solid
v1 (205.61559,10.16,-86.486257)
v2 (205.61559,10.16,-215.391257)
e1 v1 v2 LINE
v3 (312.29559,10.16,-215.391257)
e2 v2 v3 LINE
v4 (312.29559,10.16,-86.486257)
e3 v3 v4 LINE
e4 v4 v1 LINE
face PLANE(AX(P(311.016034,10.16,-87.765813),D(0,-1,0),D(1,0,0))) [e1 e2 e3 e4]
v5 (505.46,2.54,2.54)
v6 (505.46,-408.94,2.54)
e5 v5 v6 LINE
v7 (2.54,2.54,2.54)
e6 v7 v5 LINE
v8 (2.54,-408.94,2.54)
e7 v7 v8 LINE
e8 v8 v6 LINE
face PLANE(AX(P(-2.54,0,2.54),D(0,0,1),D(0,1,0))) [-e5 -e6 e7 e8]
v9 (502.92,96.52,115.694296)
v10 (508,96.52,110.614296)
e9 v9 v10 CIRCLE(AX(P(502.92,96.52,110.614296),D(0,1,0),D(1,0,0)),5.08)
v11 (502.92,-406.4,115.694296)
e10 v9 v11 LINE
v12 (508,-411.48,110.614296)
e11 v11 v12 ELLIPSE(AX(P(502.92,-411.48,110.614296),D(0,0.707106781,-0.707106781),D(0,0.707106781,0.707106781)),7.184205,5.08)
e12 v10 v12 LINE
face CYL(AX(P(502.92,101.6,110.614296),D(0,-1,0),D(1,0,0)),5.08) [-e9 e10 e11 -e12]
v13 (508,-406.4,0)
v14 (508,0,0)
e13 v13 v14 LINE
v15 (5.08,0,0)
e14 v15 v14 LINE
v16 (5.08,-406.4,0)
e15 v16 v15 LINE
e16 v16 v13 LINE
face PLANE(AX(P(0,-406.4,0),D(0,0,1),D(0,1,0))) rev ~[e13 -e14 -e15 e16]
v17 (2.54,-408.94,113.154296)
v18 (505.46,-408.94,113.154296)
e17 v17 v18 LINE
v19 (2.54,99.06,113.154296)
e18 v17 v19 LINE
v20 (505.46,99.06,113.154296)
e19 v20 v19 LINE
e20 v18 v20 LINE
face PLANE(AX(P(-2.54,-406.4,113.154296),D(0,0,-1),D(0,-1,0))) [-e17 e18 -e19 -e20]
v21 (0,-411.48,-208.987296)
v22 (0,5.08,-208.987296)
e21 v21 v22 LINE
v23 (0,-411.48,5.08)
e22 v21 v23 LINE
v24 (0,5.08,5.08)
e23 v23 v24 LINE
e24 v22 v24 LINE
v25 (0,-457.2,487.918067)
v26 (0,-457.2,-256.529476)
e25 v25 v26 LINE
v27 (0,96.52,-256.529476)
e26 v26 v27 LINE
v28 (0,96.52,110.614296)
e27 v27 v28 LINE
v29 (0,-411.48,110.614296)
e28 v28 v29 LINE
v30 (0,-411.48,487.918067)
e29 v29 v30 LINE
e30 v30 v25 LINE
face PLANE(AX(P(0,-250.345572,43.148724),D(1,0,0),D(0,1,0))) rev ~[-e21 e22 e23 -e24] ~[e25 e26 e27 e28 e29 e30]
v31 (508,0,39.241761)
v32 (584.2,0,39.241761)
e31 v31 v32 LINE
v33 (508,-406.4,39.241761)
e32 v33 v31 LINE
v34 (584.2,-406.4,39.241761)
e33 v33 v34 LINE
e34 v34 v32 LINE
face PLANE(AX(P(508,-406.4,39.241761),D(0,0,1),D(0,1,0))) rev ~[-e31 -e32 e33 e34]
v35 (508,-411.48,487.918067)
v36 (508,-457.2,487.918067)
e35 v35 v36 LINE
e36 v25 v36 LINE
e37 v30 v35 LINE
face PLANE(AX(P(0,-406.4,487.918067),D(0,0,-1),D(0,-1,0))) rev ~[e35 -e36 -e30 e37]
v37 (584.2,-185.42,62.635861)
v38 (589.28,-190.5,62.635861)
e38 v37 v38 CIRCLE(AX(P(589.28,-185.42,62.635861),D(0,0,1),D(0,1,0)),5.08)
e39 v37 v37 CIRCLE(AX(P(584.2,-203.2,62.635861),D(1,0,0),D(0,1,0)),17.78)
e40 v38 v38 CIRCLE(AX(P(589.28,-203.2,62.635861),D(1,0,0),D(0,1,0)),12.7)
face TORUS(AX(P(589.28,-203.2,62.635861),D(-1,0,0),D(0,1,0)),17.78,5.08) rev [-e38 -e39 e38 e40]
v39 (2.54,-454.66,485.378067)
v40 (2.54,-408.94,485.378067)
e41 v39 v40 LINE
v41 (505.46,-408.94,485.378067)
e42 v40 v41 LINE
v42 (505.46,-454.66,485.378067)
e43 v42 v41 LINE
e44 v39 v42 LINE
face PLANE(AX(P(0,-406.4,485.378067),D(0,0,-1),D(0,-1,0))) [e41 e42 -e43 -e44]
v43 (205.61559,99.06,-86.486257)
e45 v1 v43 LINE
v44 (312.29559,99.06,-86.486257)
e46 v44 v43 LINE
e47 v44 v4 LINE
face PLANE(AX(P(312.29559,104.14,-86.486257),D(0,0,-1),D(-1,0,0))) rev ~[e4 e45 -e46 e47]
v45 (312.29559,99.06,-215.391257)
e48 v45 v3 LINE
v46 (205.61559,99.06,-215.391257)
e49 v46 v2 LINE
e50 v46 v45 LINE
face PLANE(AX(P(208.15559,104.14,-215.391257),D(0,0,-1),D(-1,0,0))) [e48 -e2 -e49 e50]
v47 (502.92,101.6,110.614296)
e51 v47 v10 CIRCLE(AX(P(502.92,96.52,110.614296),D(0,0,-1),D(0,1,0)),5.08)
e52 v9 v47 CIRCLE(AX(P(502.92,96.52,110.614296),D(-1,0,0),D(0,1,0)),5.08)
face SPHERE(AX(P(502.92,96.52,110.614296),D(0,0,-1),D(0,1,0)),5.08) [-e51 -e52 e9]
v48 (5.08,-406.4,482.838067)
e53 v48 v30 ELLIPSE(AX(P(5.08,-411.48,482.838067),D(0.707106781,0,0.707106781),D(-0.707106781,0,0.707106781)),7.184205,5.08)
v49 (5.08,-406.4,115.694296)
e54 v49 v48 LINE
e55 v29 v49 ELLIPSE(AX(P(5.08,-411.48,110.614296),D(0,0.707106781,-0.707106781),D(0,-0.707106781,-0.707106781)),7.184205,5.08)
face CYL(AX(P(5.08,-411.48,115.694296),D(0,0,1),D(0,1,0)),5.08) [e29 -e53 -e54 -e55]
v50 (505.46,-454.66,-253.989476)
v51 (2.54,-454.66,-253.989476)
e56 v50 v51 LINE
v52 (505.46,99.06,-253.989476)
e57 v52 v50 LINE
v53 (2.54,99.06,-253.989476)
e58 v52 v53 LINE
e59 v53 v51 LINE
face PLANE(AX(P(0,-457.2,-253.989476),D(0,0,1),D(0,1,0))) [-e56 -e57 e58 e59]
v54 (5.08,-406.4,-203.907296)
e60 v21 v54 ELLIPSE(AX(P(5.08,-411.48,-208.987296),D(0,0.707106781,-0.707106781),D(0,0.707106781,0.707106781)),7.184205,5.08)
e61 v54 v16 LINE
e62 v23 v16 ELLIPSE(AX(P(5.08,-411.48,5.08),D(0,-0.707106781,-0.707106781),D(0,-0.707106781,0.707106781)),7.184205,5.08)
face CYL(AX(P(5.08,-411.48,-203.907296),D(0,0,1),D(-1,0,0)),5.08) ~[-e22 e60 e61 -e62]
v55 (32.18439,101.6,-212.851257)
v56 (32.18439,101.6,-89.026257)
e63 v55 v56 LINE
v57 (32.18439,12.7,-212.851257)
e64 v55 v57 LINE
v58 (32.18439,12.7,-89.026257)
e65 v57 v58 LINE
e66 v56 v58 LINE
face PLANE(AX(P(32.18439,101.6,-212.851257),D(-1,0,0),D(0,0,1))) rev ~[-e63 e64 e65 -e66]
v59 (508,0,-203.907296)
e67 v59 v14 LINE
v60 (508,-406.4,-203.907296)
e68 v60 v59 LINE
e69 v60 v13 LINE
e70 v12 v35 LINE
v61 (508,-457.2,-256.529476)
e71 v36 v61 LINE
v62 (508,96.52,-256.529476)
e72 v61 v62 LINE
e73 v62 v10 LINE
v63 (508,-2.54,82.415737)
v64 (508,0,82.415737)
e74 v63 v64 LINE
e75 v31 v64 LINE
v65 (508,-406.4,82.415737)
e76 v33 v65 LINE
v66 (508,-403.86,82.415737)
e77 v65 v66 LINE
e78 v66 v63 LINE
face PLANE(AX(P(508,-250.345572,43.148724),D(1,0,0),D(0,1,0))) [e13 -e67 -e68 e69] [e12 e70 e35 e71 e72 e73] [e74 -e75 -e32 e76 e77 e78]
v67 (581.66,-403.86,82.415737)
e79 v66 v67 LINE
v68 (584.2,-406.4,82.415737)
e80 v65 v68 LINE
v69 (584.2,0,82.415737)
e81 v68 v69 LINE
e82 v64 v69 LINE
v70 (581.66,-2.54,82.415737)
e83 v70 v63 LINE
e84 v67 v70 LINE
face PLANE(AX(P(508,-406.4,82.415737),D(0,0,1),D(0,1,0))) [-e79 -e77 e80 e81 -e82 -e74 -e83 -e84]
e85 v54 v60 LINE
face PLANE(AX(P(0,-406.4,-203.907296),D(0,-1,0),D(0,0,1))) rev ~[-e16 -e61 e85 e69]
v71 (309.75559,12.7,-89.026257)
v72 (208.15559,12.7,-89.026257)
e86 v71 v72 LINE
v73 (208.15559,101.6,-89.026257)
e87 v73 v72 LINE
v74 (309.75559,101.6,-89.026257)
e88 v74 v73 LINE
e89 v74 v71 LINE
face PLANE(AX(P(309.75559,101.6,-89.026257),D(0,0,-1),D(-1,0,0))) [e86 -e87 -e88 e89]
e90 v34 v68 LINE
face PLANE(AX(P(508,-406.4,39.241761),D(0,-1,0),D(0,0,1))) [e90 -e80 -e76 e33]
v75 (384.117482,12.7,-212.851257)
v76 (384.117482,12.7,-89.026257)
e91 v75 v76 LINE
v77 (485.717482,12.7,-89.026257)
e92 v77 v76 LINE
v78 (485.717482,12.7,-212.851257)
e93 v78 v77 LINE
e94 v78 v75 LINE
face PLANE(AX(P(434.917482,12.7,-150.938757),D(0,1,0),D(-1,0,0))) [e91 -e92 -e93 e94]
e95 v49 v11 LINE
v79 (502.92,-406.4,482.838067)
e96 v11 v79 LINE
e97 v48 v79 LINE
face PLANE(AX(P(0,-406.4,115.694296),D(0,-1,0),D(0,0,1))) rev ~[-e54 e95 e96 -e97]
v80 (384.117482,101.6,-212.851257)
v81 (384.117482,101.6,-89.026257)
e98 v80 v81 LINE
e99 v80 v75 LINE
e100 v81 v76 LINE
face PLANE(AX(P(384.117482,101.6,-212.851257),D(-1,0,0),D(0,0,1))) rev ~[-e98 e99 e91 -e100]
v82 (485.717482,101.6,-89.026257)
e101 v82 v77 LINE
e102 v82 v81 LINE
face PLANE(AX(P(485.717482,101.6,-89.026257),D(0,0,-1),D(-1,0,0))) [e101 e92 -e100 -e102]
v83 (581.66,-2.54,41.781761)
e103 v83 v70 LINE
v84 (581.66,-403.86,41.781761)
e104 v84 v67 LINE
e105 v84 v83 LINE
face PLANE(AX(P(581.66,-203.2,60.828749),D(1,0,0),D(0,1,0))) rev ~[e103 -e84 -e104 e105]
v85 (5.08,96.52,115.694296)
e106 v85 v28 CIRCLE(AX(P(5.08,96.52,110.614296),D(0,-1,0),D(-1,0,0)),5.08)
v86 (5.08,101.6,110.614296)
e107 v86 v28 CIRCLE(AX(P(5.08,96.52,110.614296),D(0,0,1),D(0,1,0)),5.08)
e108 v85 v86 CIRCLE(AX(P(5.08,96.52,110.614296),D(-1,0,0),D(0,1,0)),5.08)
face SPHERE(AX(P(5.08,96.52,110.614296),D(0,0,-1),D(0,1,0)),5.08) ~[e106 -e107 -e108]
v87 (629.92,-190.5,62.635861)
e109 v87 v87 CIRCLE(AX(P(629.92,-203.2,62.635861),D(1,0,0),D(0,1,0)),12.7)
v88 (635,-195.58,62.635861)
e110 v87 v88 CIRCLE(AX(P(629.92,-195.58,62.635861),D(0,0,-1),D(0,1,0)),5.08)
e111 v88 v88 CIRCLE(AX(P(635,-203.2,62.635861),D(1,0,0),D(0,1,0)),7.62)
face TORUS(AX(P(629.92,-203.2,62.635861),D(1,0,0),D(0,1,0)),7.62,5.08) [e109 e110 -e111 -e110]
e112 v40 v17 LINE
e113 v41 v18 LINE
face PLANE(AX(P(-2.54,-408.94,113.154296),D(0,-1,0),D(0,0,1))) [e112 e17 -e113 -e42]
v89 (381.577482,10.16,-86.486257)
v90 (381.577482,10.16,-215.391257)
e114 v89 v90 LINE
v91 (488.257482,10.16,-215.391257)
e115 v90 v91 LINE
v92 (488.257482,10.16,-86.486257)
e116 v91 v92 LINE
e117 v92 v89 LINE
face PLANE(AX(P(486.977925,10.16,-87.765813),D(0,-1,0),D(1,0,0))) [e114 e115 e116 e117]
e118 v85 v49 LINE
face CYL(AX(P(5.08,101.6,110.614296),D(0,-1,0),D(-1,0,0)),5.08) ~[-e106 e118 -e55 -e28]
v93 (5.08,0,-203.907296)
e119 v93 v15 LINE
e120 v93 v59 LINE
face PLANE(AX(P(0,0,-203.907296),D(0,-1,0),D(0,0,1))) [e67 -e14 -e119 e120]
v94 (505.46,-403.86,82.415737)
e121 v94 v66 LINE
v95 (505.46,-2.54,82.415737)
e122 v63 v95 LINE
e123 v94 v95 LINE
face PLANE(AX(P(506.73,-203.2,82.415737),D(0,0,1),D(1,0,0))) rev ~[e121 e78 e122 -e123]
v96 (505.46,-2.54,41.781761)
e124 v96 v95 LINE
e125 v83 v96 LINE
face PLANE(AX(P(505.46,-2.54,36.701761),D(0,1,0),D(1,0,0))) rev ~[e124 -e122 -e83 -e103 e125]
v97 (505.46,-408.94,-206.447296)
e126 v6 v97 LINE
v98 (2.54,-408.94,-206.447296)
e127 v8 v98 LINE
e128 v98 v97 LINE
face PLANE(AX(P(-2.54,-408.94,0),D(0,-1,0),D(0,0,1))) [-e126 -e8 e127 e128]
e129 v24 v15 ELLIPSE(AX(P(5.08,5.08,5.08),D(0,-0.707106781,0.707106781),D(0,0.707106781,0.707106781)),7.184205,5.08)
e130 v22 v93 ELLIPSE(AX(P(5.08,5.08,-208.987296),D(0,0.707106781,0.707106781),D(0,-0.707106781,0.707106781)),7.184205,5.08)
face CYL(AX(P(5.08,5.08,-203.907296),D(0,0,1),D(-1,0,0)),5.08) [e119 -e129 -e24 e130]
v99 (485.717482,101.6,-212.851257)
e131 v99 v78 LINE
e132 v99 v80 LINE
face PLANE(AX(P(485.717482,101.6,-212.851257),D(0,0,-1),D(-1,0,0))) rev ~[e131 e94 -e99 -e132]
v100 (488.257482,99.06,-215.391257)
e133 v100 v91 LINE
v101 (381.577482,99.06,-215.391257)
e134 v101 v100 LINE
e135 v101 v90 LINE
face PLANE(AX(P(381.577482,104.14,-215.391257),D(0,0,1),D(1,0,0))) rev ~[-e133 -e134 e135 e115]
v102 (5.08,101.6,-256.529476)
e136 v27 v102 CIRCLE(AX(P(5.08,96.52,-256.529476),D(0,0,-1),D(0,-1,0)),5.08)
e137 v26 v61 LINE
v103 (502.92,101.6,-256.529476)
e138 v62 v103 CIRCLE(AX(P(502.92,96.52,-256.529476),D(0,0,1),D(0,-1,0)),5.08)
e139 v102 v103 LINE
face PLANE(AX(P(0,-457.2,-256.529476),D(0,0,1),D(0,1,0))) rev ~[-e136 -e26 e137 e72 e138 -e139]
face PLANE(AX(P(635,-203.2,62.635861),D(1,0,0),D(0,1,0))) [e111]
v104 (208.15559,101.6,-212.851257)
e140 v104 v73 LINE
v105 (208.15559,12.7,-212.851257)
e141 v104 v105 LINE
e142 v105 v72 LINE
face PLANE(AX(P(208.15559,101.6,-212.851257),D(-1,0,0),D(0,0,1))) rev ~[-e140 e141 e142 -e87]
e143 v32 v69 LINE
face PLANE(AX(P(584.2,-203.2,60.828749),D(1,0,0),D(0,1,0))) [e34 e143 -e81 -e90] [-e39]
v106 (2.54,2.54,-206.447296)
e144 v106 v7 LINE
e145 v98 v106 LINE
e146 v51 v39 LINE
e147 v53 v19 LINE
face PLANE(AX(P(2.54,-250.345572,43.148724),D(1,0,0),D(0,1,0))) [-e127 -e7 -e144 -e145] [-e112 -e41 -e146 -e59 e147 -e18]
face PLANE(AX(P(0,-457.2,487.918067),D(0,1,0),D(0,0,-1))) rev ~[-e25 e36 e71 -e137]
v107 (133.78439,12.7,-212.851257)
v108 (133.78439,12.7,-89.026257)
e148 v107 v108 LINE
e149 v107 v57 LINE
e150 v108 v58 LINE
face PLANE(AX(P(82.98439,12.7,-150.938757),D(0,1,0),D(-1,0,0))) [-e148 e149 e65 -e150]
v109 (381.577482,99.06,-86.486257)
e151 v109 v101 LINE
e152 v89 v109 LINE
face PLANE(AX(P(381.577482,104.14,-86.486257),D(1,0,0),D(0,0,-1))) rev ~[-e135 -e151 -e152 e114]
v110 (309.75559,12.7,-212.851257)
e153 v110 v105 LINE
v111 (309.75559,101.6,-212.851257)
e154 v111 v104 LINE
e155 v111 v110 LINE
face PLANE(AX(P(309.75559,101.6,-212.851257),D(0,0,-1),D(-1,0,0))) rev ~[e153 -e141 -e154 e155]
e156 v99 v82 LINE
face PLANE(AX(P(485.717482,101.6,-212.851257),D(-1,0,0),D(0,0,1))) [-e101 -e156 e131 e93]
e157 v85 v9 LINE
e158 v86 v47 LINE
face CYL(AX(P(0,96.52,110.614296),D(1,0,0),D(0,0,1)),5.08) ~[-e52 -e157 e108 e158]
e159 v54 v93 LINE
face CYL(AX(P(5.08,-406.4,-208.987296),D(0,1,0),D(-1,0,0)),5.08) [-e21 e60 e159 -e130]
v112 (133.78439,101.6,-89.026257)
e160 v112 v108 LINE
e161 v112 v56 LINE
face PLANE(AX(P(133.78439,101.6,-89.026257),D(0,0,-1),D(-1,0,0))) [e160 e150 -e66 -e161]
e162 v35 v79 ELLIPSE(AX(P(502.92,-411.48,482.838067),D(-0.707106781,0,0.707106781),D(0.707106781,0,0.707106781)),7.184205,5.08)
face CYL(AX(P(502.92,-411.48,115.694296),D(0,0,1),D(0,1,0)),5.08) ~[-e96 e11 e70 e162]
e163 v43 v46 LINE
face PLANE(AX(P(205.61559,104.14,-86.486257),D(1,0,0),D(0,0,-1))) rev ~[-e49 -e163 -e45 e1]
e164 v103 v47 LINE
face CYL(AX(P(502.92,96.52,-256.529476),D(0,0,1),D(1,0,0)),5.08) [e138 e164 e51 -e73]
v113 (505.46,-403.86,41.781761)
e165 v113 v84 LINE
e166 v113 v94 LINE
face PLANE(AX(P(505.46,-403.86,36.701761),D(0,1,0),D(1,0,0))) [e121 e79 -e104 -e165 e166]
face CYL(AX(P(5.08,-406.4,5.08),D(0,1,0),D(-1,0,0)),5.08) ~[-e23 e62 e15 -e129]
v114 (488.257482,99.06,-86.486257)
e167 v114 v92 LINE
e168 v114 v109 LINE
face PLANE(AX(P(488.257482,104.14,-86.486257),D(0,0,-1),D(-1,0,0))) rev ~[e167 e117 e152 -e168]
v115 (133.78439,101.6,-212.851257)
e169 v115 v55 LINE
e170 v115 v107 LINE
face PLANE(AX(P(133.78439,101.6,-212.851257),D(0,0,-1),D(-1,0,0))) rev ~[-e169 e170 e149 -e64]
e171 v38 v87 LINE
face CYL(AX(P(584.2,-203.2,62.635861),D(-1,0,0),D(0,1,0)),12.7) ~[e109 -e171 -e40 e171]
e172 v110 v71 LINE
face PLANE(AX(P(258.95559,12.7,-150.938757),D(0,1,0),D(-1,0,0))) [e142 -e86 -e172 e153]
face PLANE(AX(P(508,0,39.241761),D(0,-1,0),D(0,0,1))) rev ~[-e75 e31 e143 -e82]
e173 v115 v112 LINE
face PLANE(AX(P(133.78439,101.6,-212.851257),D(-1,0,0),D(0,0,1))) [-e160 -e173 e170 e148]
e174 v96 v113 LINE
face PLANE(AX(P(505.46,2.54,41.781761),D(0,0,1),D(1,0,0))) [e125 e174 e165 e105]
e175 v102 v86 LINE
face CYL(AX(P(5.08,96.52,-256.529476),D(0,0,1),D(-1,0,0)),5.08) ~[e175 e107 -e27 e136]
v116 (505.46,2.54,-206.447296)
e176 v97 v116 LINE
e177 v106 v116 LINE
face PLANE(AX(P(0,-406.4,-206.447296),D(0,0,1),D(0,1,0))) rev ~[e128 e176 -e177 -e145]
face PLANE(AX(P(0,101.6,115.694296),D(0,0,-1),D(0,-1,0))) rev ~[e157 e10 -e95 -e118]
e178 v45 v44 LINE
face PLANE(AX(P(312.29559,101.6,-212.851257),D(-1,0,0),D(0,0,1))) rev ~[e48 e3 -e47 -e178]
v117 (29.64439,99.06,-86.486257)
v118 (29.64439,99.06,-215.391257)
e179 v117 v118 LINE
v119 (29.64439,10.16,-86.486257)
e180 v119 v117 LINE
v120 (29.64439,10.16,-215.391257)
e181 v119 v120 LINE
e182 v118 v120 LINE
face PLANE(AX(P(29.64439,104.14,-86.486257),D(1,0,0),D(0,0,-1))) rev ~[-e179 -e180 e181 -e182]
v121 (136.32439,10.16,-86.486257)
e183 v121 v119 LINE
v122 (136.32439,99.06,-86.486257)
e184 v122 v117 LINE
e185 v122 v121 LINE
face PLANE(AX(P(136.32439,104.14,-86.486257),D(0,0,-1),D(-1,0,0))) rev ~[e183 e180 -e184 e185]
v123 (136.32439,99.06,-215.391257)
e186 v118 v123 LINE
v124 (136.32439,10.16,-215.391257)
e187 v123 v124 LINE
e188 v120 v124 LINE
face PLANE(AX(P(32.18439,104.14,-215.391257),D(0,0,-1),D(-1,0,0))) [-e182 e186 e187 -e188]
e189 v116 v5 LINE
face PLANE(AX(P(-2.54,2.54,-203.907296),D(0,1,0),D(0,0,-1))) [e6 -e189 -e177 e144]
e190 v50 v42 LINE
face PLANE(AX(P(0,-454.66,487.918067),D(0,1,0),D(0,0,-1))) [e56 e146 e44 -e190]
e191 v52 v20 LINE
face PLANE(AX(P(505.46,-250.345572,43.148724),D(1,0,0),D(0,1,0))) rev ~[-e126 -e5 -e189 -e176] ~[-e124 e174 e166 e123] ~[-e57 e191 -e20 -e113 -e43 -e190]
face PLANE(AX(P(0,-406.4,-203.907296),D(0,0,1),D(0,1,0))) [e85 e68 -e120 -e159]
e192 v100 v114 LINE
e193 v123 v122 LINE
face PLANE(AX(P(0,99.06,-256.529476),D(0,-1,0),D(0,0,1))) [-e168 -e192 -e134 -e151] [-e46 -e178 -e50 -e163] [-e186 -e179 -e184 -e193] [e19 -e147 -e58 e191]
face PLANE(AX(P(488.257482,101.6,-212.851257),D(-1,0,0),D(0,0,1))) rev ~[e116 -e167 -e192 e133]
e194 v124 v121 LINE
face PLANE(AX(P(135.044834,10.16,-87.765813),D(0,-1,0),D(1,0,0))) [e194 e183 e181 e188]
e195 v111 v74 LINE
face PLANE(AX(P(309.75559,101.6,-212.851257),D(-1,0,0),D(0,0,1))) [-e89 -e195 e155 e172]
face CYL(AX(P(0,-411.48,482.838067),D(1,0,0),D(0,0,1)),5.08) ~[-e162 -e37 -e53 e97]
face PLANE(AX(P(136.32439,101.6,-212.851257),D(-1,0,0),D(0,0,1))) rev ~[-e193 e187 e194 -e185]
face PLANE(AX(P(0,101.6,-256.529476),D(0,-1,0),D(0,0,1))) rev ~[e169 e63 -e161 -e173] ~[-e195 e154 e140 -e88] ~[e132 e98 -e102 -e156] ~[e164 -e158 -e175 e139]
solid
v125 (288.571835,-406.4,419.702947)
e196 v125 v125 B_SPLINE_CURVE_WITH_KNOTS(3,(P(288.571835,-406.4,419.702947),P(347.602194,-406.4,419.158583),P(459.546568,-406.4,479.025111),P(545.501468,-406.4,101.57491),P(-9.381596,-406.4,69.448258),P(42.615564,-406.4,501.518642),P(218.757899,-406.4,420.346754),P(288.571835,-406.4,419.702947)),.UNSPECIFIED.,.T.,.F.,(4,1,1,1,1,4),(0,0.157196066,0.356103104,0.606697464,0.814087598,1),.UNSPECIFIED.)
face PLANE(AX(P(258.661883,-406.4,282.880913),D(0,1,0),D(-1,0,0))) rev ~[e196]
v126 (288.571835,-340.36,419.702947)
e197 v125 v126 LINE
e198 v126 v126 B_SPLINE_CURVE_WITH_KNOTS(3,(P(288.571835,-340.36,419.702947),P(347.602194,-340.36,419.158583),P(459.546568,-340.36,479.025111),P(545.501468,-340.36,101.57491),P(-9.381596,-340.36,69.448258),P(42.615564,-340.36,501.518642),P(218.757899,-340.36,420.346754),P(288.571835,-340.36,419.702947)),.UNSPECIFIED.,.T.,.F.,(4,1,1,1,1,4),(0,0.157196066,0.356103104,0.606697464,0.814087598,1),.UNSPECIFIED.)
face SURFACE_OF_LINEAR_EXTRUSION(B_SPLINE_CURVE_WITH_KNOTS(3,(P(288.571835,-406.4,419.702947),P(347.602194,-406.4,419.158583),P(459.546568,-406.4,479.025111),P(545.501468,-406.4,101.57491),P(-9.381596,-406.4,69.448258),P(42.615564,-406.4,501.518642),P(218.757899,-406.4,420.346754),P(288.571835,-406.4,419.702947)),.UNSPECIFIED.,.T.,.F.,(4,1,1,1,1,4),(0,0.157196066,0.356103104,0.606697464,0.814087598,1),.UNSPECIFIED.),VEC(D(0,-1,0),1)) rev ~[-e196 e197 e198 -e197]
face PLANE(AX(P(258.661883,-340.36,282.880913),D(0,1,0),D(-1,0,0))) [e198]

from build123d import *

# Parameters (mm, degrees)
F0_W         = 406.4
F0_H         = 203.9072960615
F1_DEPTH     = 508
F3_DEPTH     = 66.04
F4_W         = 101.6
F4_H         = 123.825
F5_DEPTH     = 88.9
F6_W         = 406.4
F6_H         = 43.1739762425
F7_DEPTH     = 76.2
F8_T         = 2.54
F8_T3_DEPTH  = 513.08
F8_T5_DEPTH  = 48.2539762425
F8_T7_DEPTH  = 411.48
F8_T9_DEPTH  = 93.98
F8_T11_DEPTH = 106.68
F8_T13_DEPTH = 128.905
F8_T15_DEPTH = 106.68
F8_T17_DEPTH = 106.68
F9_R         = 12.7
F10_DEPTH    = 50.8
F11_R        = 5.08


# Not quite as in the source:
# - a shell that OpenCascade refuses in one call is made with other operations: the cavity is built on its own and cut out


with BuildPart() as f1:
    # F0 (on Right) → F1 (new body)
    with BuildSketch(Plane.YZ):
        Polygon((-406.4, 487.9180668924), (-457.2, 487.9180668924), (-457.2, -256.5294758297), (-406.4, -256.5294758297), (0, -256.5294758297), (101.6, -256.5294758297), (101.6, 115.6942955313), (-406.4, 115.6942955313), align=None)
        with Locations((-203.2, -101.9536480308)):
            Rectangle(F0_W, F0_H, mode=Mode.SUBTRACT)
    extrude(amount=F1_DEPTH)

    # F4 (on face) → F5 (cut)
    with BuildSketch(Plane(origin=(0, 101.6, 0), x_dir=(-1, 0, 0), z_dir=(0, 1, 0))):
        with Locations((-434.9174816871, -150.9387567639)):
            Rectangle(F4_W, F4_H)
        with Locations((-258.955590483, -150.9387567639)):
            Rectangle(F4_W, F4_H)
        with Locations((-82.984390483, -150.9387567639)):
            Rectangle(F4_W, F4_H)
    extrude(amount=-F5_DEPTH, mode=Mode.SUBTRACT)

    # F6 (on face) → F7 (join)
    with BuildSketch(Plane.YZ.offset(508)):
        with Locations((-203.2, 60.8287490904)):
            Rectangle(F6_W, F6_H)
    extrude(amount=F7_DEPTH)

    # F8: shell of thickness 2.54, made by hand


with BuildPart() as f3:
    # F2 (on face) → F3 (new body)
    with BuildSketch(Plane(origin=(0, -406.4, 0), x_dir=(-1, 0, 0), z_dir=(0, 1, 0))):
        with BuildLine():
            add(Edge.make_bspline(
                [(-288.5718345642, 419.7029471397), (-347.6021943127, 419.1585833452), (-459.5465679813, 479.02511134), (-545.5014679601, 101.5749100376), (9.3815956545, 69.448257945), (-42.615563951, 501.5186421954), (-218.7578993917, 420.3467544759), (-288.5718345642, 419.7029471397)],
                knots=[0, 0, 0, 0, 0.1571960663, 0.3561031036, 0.6066974638, 0.8140875979, 1, 1, 1, 1], degree=3))
        make_face()
    extrude(amount=F3_DEPTH)


with BuildPart() as f8_core1:
    # F8_t2: copy of F1
    add(f1.part)

    # the walls: a layer under each face that stays
    f8_faces = [f8_core1.faces().sort_by_distance(p)[0] for p in [
        (254, -152.4, 115.6942955313),
        (254, 101.6, -70.4175901492),
        (254, -406.4, 301.8061812119),
        (0, 8.4666666667, -132.454885376),
        (508, 8.4666666667, -132.454885376),
        (254, -177.8, -256.5294758297),
        (258.955590483, 57.15, -212.8512567639),
        (309.755590483, 57.15, -150.9387567639),
        (258.955590483, 57.15, -89.0262567639),
        (208.155590483, 57.15, -150.9387567639),
        (485.7174816871, 57.15, -150.9387567639),
        (434.9174816871, 57.15, -89.0262567639),
        (384.1174816871, 57.15, -150.9387567639),
        (434.9174816871, 57.15, -212.8512567639),
        (82.984390483, 57.15, -212.8512567639),
        (133.784390483, 57.15, -150.9387567639),
        (82.984390483, 57.15, -89.0262567639),
        (32.184390483, 57.15, -150.9387567639),
        (254, -431.8, 487.9180668924),
        (254, -457.2, 115.6942955313),
        (254, -406.4, -101.9536480308),
        (254, -203.2, 0),
        (254, 0, -101.9536480308),
        (254, -203.2, -203.9072960615),
        (546.1, -406.4, 60.8287490904),
        (546.1, -203.2, 39.2417609692),
        (546.1, 0, 60.8287490904),
        (258.955590483, 12.7, -150.9387567639),
        (434.9174816871, 12.7, -150.9387567639),
        (82.984390483, 12.7, -150.9387567639),
        (584.2, -203.2, 60.8287490904),
    ]]
    thicken(f8_faces, amount=-F8_T, mode=Mode.SUBTRACT)

    # F8_s4 → F8_t3 (cut)
    with BuildSketch(Plane.YZ.offset(-2.54)):
        Polygon((-406.3746, 115.7196955313), (-406.4, 113.1542955313), (-408.94, 113.1542955313), (-408.94, 115.6942955313), align=None)
        Polygon((-406.3746, -203.8818960615), (-408.94, -203.9072960615), (-408.94, -206.4472960615), (-406.4, -206.4472960615), align=None)
        Polygon((-406.3746, -0.0254), (-408.94, 0), (-408.94, 2.54), (-406.4, 2.54), align=None)
        Polygon((-0.0254, -0.0254), (0, 2.54), (2.54, 2.54), (2.54, 0), align=None)
        Polygon((-0.0254, -203.8818960615), (2.54, -203.9072960615), (2.54, -206.4472960615), (0, -206.4472960615), align=None)
    extrude(amount=F8_T3_DEPTH, mode=Mode.SUBTRACT)

    # F8_s6 → F8_t5 (cut)
    with BuildSketch(Plane.XY.offset(36.7017609692)):
        Polygon((508.0254, -406.4254), (505.46, -406.4), (505.46, -403.86), (508, -403.86), align=None)
        Polygon((508.0254, 0.0254), (505.46, 0), (505.46, -2.54), (508, -2.54), align=None)
    extrude(amount=F8_T5_DEPTH, mode=Mode.SUBTRACT)

    # F8_s8 → F8_t7 (cut)
    with BuildSketch(Plane.XZ.offset(-2.54)):
        Polygon((508.0254, 39.2163609692), (505.46, 39.2417609692), (505.46, 41.7817609692), (508, 41.7817609692), align=None)
    extrude(amount=F8_T7_DEPTH, mode=Mode.SUBTRACT)

    # F8_s10 → F8_t9 (cut)
    with BuildSketch(Plane.XZ.offset(-104.14)):
        Polygon((309.730190483, -212.8258567639), (309.755590483, -215.3912567639), (312.295590483, -215.3912567639), (312.295590483, -212.8512567639), align=None)
        Polygon((208.180990483, -212.8258567639), (208.155590483, -215.3912567639), (205.615590483, -215.3912567639), (205.615590483, -212.8512567639), align=None)
        Polygon((309.730190483, -89.0516567639), (312.295590483, -89.0262567639), (312.295590483, -86.4862567639), (309.755590483, -86.4862567639), align=None)
        Polygon((208.180990483, -89.0516567639), (208.155590483, -86.4862567639), (205.615590483, -86.4862567639), (205.615590483, -89.0262567639), align=None)
        Polygon((485.6920816871, -89.0516567639), (488.2574816871, -89.0262567639), (488.2574816871, -86.4862567639), (485.7174816871, -86.4862567639), align=None)
        Polygon((485.6920816871, -212.8258567639), (488.2574816871, -212.8512567639), (488.2574816871, -215.3912567639), (485.7174816871, -215.3912567639), align=None)
        Polygon((384.1428816871, -89.0516567639), (384.1174816871, -86.4862567639), (381.5774816871, -86.4862567639), (381.5774816871, -89.0262567639), align=None)
        Polygon((384.1428816871, -212.8258567639), (381.5774816871, -212.8512567639), (381.5774816871, -215.3912567639), (384.1174816871, -215.3912567639), align=None)
        Polygon((133.758990483, -212.8258567639), (133.784390483, -215.3912567639), (136.324390483, -215.3912567639), (136.324390483, -212.8512567639), align=None)
        Polygon((32.209790483, -212.8258567639), (32.184390483, -215.3912567639), (29.644390483, -215.3912567639), (29.644390483, -212.8512567639), align=None)
        Polygon((133.758990483, -89.0516567639), (136.324390483, -89.0262567639), (136.324390483, -86.4862567639), (133.784390483, -86.4862567639), align=None)
        Polygon((32.209790483, -89.0516567639), (32.184390483, -86.4862567639), (29.644390483, -86.4862567639), (29.644390483, -89.0262567639), align=None)
    extrude(amount=F8_T9_DEPTH, mode=Mode.SUBTRACT)

    # F8_s12 → F8_t11 (cut)
    with BuildSketch(Plane.YZ.offset(205.615590483)):
        Polygon((12.7254, -212.8258567639), (12.7, -215.3912567639), (10.16, -215.3912567639), (10.16, -212.8512567639), align=None)
        Polygon((12.7254, -89.0516567639), (12.7, -86.4862567639), (10.16, -86.4862567639), (10.16, -89.0262567639), align=None)
    extrude(amount=F8_T11_DEPTH, mode=Mode.SUBTRACT)

    # F8_s14 → F8_t13 (cut)
    with BuildSketch(Plane.XY.offset(-215.3912567639)):
        Polygon((309.730190483, 12.7254), (312.295590483, 12.7), (312.295590483, 10.16), (309.755590483, 10.16), align=None)
        Polygon((208.180990483, 12.7254), (205.615590483, 12.7), (205.615590483, 10.16), (208.155590483, 10.16), align=None)
        Polygon((485.6920816871, 12.7254), (488.2574816871, 12.7), (488.2574816871, 10.16), (485.7174816871, 10.16), align=None)
        Polygon((384.1428816871, 12.7254), (381.5774816871, 12.7), (381.5774816871, 10.16), (384.1174816871, 10.16), align=None)
        Polygon((133.758990483, 12.7254), (136.324390483, 12.7), (136.324390483, 10.16), (133.784390483, 10.16), align=None)
        Polygon((32.209790483, 12.7254), (29.644390483, 12.7), (29.644390483, 10.16), (32.184390483, 10.16), align=None)
    extrude(amount=F8_T13_DEPTH, mode=Mode.SUBTRACT)

    # F8_s16 → F8_t15 (cut)
    with BuildSketch(Plane.YZ.offset(381.5774816871)):
        Polygon((12.7254, -89.0516567639), (12.7, -86.4862567639), (10.16, -86.4862567639), (10.16, -89.0262567639), align=None)
        Polygon((12.7254, -212.8258567639), (12.7, -215.3912567639), (10.16, -215.3912567639), (10.16, -212.8512567639), align=None)
    extrude(amount=F8_T15_DEPTH, mode=Mode.SUBTRACT)

    # F8_s18 → F8_t17 (cut)
    with BuildSketch(Plane.YZ.offset(29.644390483)):
        Polygon((12.7254, -212.8258567639), (12.7, -215.3912567639), (10.16, -215.3912567639), (10.16, -212.8512567639), align=None)
        Polygon((12.7254, -89.0516567639), (12.7, -86.4862567639), (10.16, -86.4862567639), (10.16, -89.0262567639), align=None)
    extrude(amount=F8_T17_DEPTH, mode=Mode.SUBTRACT)


with BuildPart() as f1_1:
    add(f1.part)

    # what is left inside the walls is the cavity
    f8_cavity = [f8_core1.part.solids().sort_by_distance(p)[0] for p in [
        (337.82, -454.6346, 115.694296),
    ]]
    add(f8_cavity, mode=Mode.SUBTRACT)

    # F9 (on face) → F10 (join)
    with BuildSketch(Plane.YZ.offset(584.2)):
        with Locations((-203.2, 62.6358613372)):
            Circle(F9_R)
    extrude(amount=F10_DEPTH)

    # F11
    f11_edges = [f1_1.edges().sort_by_distance(p)[0] for p in [
        (508, 101.6, -70.41759),
        (0, 101.6, -70.41759),
        (254, 101.6, 115.694296),
        (0, -152.4, 115.694296),
        (0, -406.4, 301.806181),
        (254, -406.4, 487.918067),
        (508, -406.4, 301.806181),
        (508, -152.4, 115.694296),
        (609.6, -190.5, 62.635861),
        (584.2, -215.9, 62.635861),
        (635, -215.9, 62.635861),
        (0, -406.4, -101.953648),
        (0, -203.2, 0),
        (0, 0, -101.953648),
        (0, -203.2, -203.907296),
    ]]
    fillet(f11_edges, radius=F11_R)


solid = Compound([f3.part, f1_1.part])
